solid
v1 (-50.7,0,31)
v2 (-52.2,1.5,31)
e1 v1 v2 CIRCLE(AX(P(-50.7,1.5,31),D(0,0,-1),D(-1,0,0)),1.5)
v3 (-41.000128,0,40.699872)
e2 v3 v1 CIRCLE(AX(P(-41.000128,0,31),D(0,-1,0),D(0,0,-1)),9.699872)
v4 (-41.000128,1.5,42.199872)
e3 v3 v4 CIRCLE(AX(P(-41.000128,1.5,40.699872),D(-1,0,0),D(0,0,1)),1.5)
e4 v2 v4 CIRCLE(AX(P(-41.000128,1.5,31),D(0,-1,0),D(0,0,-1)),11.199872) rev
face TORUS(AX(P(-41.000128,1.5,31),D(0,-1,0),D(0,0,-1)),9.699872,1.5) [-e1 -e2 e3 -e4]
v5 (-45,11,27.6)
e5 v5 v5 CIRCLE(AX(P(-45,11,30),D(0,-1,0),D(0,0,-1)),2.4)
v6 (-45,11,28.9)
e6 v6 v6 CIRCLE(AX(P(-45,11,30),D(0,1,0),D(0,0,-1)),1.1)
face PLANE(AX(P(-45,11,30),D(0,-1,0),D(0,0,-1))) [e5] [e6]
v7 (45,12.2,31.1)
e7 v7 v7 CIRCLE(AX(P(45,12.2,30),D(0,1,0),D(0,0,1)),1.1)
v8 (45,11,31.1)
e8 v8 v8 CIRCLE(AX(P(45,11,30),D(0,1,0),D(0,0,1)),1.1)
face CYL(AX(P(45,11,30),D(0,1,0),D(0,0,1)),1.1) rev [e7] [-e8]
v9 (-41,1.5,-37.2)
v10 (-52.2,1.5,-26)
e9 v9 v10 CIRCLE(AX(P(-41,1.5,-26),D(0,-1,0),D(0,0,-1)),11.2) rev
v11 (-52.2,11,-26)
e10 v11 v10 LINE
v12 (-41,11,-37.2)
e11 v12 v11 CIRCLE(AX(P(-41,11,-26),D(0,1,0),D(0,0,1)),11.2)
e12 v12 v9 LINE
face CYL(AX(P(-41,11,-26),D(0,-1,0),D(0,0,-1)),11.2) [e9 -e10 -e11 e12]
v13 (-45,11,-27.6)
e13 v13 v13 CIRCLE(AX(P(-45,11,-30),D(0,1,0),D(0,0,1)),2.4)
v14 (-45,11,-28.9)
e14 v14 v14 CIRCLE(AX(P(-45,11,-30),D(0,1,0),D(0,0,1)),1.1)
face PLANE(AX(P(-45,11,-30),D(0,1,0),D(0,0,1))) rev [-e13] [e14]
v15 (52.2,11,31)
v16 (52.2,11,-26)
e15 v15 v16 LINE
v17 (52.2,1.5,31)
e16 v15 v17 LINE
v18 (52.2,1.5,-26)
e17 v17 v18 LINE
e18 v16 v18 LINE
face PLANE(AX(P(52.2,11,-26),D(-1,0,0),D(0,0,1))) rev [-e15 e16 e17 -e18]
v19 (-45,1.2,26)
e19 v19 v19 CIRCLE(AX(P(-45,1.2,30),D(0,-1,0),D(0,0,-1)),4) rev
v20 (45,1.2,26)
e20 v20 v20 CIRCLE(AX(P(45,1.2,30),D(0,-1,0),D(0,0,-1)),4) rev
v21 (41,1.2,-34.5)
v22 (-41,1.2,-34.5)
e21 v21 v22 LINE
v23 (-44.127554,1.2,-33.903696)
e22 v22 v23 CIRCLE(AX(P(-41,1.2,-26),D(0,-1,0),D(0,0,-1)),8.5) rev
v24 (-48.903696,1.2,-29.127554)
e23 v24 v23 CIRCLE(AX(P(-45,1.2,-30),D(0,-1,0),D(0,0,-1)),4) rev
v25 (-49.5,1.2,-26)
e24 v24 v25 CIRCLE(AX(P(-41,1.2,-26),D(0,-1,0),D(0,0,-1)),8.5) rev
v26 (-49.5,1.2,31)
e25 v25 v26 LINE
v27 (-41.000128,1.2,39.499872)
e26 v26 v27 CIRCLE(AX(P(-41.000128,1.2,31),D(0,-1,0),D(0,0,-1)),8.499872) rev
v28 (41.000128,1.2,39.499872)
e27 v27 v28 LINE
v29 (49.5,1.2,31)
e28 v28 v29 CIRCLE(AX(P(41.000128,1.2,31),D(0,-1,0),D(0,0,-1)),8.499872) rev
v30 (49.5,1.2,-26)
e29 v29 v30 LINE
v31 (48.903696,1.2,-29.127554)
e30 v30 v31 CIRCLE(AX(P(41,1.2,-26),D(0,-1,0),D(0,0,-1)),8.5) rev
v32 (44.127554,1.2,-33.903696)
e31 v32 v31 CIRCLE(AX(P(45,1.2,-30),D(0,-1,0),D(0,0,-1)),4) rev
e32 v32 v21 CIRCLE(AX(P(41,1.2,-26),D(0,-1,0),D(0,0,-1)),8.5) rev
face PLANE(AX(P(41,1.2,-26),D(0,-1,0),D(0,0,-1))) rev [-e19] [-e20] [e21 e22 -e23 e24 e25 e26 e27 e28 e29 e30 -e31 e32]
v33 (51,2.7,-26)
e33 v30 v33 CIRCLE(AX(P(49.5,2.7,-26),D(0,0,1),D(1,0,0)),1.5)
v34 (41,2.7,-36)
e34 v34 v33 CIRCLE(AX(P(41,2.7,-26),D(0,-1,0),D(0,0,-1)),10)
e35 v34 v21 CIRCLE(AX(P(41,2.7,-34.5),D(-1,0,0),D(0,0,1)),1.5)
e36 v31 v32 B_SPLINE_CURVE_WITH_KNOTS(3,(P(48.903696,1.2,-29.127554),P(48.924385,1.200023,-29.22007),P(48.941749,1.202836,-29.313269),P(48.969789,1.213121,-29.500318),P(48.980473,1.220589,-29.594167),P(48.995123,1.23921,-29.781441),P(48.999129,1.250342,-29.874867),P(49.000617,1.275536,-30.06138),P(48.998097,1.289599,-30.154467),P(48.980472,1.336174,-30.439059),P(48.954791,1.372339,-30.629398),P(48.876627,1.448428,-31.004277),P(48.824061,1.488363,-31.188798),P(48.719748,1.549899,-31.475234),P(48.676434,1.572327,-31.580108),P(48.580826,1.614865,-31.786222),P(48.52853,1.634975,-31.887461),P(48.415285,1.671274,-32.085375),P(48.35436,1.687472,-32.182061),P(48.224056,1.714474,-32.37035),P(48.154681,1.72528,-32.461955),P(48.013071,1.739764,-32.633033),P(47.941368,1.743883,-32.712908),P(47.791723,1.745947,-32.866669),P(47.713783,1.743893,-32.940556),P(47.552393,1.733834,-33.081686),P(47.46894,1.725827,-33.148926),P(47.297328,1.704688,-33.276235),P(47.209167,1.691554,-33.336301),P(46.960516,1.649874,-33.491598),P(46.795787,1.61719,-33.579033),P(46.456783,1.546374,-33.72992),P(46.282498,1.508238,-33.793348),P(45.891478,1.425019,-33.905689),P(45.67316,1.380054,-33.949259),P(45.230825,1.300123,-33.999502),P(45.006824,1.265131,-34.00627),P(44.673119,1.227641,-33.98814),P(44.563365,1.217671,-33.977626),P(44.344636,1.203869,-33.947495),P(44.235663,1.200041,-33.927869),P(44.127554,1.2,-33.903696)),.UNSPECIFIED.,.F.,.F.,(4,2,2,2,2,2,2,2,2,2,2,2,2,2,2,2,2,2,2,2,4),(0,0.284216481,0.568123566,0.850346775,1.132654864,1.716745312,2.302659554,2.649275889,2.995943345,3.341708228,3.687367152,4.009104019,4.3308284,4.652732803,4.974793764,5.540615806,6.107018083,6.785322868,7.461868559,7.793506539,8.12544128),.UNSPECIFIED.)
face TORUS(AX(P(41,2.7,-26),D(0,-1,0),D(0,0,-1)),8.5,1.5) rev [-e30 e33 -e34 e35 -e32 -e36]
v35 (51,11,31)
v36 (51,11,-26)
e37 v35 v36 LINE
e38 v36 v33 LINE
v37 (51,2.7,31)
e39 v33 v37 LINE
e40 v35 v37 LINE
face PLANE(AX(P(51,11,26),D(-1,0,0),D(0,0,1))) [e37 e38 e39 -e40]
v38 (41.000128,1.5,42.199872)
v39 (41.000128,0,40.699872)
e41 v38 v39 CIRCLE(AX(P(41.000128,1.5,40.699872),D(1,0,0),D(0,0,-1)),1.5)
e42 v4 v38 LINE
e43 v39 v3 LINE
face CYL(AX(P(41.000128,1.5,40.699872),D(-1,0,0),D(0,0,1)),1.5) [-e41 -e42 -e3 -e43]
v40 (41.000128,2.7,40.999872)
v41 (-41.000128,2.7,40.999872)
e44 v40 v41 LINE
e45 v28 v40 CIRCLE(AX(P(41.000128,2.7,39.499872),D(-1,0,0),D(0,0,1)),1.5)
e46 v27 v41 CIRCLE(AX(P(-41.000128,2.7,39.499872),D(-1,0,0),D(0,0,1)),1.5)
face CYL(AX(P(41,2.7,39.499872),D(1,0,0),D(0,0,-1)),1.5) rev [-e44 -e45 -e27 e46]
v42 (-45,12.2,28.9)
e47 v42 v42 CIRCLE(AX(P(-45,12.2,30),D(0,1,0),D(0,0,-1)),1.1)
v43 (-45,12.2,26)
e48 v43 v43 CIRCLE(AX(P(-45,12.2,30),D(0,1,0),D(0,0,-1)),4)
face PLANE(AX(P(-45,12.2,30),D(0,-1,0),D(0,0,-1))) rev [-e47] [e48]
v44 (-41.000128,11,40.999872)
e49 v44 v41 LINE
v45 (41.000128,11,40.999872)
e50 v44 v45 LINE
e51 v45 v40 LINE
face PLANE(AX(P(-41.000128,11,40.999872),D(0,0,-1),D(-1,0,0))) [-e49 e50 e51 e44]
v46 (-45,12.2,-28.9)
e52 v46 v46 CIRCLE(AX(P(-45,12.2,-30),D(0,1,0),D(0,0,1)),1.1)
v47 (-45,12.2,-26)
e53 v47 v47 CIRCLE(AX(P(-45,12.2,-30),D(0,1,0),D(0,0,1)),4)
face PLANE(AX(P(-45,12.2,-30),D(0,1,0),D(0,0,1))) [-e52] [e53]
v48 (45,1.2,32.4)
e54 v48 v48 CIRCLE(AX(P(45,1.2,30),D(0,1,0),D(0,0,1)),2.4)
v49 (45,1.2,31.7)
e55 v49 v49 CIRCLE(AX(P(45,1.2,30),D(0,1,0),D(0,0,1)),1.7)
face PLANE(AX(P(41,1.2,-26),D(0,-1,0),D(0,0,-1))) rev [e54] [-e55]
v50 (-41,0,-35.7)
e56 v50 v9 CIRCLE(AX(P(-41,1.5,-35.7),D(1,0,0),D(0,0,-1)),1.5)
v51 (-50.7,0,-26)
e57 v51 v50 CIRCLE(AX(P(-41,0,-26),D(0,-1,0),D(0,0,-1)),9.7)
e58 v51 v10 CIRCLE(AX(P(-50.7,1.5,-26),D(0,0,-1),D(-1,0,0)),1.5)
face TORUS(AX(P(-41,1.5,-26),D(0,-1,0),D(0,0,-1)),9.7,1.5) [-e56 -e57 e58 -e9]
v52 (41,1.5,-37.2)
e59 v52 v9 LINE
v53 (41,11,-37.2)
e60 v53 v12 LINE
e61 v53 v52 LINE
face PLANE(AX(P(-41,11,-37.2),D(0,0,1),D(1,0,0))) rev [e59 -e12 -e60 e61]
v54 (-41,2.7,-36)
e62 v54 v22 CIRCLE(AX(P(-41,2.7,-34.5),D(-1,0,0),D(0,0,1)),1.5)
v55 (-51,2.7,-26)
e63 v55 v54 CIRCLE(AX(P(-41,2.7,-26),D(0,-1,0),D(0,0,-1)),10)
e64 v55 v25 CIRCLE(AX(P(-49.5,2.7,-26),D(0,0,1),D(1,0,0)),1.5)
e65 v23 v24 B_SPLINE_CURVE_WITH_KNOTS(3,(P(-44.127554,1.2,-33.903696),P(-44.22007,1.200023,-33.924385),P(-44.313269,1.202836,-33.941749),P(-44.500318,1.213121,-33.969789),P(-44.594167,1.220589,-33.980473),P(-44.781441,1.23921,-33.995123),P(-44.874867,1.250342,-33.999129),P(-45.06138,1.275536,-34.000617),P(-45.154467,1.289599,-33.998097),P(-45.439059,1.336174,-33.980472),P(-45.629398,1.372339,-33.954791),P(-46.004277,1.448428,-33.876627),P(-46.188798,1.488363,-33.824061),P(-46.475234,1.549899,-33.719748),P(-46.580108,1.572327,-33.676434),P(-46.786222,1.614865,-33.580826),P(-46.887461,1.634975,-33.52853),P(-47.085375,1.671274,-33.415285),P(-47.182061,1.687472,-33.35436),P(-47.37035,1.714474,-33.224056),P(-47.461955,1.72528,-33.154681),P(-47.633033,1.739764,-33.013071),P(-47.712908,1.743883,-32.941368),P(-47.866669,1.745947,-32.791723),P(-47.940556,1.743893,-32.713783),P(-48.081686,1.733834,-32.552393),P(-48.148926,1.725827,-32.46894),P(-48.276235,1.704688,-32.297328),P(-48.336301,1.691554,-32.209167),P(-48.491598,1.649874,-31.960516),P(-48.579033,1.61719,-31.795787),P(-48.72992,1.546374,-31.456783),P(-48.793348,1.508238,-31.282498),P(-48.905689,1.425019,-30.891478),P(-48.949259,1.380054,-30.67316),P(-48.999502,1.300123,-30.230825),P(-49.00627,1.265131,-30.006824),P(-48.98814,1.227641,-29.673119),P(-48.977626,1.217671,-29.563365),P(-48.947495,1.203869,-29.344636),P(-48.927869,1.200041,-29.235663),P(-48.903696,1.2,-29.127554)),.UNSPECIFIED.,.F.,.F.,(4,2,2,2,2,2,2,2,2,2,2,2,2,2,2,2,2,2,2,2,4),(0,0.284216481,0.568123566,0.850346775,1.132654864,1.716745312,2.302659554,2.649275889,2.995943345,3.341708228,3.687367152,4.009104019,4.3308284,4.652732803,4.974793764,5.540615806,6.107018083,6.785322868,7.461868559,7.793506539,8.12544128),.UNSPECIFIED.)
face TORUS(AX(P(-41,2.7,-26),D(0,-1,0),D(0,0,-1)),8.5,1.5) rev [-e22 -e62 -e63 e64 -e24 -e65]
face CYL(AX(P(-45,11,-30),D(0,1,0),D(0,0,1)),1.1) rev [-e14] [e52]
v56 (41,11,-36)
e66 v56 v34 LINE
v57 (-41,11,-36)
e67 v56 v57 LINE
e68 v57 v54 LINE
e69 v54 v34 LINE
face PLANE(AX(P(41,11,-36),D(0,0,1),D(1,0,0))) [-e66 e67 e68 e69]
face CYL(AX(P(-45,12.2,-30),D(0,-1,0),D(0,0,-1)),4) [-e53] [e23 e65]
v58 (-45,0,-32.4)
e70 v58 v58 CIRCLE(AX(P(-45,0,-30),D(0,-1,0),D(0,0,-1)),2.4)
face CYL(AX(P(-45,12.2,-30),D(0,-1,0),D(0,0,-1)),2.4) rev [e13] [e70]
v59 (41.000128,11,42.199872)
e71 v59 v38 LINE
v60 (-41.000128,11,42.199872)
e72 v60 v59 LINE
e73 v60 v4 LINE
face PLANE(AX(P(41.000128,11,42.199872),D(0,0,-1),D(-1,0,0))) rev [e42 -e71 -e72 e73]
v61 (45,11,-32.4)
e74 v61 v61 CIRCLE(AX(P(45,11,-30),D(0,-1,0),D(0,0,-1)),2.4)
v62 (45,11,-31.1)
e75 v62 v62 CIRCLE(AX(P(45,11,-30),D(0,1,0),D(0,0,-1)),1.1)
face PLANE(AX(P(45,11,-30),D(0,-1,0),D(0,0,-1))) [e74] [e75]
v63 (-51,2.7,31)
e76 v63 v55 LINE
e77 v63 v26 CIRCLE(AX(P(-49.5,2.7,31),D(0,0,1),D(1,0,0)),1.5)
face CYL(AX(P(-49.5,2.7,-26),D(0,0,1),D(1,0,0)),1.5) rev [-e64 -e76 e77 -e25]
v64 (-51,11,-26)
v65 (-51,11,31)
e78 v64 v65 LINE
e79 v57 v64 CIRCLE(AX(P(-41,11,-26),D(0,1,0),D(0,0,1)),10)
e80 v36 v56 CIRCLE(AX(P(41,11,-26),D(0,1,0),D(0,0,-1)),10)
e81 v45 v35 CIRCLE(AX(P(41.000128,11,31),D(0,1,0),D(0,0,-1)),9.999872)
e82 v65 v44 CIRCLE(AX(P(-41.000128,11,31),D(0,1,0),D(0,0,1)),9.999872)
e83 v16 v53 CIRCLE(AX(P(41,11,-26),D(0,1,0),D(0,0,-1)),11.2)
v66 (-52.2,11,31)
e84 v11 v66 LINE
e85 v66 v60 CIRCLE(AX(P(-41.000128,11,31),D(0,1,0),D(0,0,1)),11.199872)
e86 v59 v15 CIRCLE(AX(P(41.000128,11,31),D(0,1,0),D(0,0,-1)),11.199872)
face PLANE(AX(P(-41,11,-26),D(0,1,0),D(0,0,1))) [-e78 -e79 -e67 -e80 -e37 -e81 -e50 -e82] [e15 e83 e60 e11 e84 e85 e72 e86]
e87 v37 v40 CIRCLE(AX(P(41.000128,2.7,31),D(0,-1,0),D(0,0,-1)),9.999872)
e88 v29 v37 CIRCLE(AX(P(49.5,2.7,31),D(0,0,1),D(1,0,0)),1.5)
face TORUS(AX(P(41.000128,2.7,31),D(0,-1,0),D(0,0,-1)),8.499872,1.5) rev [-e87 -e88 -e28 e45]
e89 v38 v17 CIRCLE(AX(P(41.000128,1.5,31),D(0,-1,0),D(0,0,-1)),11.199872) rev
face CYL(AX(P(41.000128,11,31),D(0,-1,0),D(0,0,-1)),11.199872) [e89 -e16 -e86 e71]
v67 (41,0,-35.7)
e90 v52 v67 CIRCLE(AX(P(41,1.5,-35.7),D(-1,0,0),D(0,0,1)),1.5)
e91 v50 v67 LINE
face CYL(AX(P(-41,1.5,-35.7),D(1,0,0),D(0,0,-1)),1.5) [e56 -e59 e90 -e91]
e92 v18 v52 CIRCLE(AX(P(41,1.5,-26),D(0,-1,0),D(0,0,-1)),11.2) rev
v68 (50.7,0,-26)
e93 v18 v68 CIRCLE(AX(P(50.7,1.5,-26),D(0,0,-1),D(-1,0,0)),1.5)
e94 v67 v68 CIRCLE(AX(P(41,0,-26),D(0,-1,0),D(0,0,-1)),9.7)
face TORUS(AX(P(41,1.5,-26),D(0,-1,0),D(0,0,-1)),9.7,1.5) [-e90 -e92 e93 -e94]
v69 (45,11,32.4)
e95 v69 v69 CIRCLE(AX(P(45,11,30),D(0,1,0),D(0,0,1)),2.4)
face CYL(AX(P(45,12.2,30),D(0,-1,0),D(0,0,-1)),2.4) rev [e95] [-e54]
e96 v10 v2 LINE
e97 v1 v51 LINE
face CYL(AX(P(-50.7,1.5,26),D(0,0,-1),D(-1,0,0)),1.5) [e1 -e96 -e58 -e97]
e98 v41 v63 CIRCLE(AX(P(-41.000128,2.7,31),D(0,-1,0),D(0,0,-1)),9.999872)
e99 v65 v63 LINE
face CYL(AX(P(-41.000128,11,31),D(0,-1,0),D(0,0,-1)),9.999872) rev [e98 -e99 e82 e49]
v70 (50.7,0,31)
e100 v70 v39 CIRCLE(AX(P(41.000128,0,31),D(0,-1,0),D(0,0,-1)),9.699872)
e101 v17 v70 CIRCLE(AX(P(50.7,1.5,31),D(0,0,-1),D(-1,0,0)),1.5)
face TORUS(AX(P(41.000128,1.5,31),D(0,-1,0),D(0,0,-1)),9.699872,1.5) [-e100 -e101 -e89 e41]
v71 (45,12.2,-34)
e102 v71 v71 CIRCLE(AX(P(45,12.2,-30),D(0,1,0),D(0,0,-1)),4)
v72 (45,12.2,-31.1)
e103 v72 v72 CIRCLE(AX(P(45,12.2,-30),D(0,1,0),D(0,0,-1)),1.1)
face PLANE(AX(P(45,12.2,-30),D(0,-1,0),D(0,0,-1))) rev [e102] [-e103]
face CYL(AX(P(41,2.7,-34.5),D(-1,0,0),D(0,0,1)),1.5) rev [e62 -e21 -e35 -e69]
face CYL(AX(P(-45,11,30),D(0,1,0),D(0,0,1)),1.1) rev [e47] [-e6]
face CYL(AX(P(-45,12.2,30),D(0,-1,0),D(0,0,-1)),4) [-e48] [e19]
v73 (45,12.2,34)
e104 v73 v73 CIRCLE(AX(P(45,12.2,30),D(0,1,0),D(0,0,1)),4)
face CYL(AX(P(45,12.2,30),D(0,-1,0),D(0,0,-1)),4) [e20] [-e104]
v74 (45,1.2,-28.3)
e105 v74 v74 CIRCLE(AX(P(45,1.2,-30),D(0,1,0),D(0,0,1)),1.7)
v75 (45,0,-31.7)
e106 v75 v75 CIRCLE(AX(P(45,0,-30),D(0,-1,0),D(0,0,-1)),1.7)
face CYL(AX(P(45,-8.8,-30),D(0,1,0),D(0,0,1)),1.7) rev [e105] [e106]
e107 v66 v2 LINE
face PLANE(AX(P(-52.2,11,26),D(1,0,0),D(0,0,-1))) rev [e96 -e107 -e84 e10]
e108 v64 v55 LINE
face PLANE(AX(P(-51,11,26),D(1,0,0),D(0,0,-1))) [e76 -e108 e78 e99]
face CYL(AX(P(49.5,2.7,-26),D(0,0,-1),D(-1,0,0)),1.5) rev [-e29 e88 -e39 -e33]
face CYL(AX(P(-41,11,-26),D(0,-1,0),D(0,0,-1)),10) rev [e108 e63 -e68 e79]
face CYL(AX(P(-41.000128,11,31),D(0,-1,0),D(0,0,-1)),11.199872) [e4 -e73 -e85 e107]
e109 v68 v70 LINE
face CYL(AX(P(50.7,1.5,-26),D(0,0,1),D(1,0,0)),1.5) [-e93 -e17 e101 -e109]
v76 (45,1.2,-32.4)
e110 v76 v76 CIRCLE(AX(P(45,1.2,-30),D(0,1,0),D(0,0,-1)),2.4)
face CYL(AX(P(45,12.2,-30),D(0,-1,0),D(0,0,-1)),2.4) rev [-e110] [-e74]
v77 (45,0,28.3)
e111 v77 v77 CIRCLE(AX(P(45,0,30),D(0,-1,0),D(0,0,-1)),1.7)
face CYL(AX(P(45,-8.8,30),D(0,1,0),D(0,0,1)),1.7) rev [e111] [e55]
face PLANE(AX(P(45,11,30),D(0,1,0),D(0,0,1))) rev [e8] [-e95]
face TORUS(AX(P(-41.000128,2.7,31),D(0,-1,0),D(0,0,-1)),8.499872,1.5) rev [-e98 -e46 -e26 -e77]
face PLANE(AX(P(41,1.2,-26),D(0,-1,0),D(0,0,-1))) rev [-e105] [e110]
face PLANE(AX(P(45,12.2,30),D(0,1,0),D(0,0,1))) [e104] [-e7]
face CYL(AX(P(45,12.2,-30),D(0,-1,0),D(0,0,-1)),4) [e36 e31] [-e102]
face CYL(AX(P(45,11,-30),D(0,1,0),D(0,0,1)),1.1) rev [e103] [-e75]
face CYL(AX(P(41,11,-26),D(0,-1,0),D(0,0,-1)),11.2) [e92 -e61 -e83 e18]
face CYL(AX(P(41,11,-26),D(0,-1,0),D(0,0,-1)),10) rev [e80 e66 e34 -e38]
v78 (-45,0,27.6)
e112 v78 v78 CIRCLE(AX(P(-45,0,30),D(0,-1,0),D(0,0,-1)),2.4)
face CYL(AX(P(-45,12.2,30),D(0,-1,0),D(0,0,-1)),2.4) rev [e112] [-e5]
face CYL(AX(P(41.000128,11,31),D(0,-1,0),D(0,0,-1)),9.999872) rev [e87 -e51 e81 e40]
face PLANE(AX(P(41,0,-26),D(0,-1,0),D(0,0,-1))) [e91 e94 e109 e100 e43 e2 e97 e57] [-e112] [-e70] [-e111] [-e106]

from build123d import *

# Parameters (mm, degrees)
EXTRUDE_3_DEPTH     = 1.2
EXTRUDE_4_DEPTH     = 11
SKETCH_6_R          = 4
SKETCH_6_R_2        = 2.4
EXTRUDE_5_DEPTH     = 11
CUT_EXTRUDE_START   = -10
SKETCH_7_R          = 2.4
SKETCH_7_R_2        = 1.7
CUT_EXTRUDE_1_DEPTH = 10
EXTRUDE_START       = -1.2
SKETCH_8_R          = 2.4
SKETCH_8_R_2        = 1.1
EXTRUDE_6_DEPTH     = 1.2
FILLET_1_R          = 1.5


with BuildPart() as part:
    # 草图1 → 凸台-拉伸3 (new body)
    with BuildSketch(Plane(origin=(0, 0, 0), x_dir=(1, 0, 0), z_dir=(0, 1, 0))):
        with BuildLine():
            Line((51, -26), (51, 26))
            ThreePointArc((51, 26), (48.071067812, 33.071067812), (41, 36))
            Line((41, 36), (-41, 36))
            ThreePointArc((-41, 36), (-48.071067812, 33.071067812), (-51, 26))
            Line((-51, 26), (-51, -26))
            Line((-51, -26), (-51, -31))
            ThreePointArc((-51, -31), (-48.071067812, -38.071067812), (-41, -41))
            Line((-41, -41), (41, -41))
            ThreePointArc((41, -41), (48.071067812, -38.071067812), (51, -31))
            Line((51, -31), (51, -26))
        make_face()
    extrude(amount=EXTRUDE_3_DEPTH)

    # 草图4 → 凸台-拉伸4 (add)
    with BuildSketch(Plane(origin=(0, 0, 0), x_dir=(1, 0, 0), z_dir=(0, 1, 0))):
        with BuildLine():
            Line((-41, 37.2), (41, 37.2))
            ThreePointArc((41, 37.2), (48.919595949, 33.919595949), (52.2, 26))
            Line((52.2, 26), (52.2, -26))
            Line((52.2, -26), (52.2, -31))
            ThreePointArc((52.2, -31), (48.919633331, -38.919505702), (41.000127629, -42.199872371))
            Line((41.000127629, -42.199872371), (-41.000127629, -42.199872371))
            ThreePointArc((-41.000127629, -42.199872371), (-48.919633331, -38.919505702), (-52.2, -31))
            Line((-52.2, -31), (-52.2, -26))
            Line((-52.2, -26), (-52.2, 26))
            ThreePointArc((-52.2, 26), (-48.919595949, 33.919595949), (-41, 37.2))
        make_face()
        with BuildLine():
            Line((51, -26), (51, 26))
            ThreePointArc((51, 26), (48.071067812, 33.071067812), (41, 36))
            Line((41, 36), (-41, 36))
            ThreePointArc((-41, 36), (-48.071067812, 33.071067812), (-51, 26))
            Line((-51, 26), (-51, -26))
            Line((-51, -26), (-51, -31))
            ThreePointArc((-51, -31), (-48.071105194, -38.070977564), (-41.000127629, -40.999872371))
            Line((-41.000127629, -40.999872371), (41.000127629, -40.999872371))
            ThreePointArc((41.000127629, -40.999872371), (48.071105194, -38.070977564), (51, -31))
            Line((51, -31), (51, -26))
        make_face(mode=Mode.SUBTRACT)
    extrude(amount=EXTRUDE_4_DEPTH)

    # 草图6 → 凸台-拉伸5 (add)
    # profile 1 of 4: a face of its own
    with BuildSketch(Plane(origin=(0, 1.2, 0), x_dir=(1, 0, 0), z_dir=(0, 1, 0))):
        with Locations(Location((-45, 30, 0), (0, 0, 90))):
            Circle(SKETCH_6_R)
        with Locations(Location((-45, 30, 0), (0, 0, 270))):
            Circle(SKETCH_6_R_2, mode=Mode.SUBTRACT)
    # profile 2 of 4: a face of its own
    with BuildSketch(Plane(origin=(0, 1.2, 0), x_dir=(1, 0, 0), z_dir=(0, 1, 0))):
        with Locations(Location((45, 30, 0), (0, 0, 90))):
            Circle(SKETCH_6_R)
        with Locations(Location((45, 30, 0), (0, 0, 90))):
            Circle(SKETCH_6_R_2, mode=Mode.SUBTRACT)
    # profile 3 of 4: a face of its own
    with BuildSketch(Plane(origin=(0, 1.2, 0), x_dir=(1, 0, 0), z_dir=(0, 1, 0))):
        with Locations(Location((45, -30, 0), (0, 0, 90))):
            Circle(SKETCH_6_R)
        with Locations(Location((45, -30, 0), (0, 0, 270))):
            Circle(SKETCH_6_R_2, mode=Mode.SUBTRACT)
    # profile 4 of 4: a face of its own
    with BuildSketch(Plane(origin=(0, 1.2, 0), x_dir=(1, 0, 0), z_dir=(0, 1, 0))):
        with Locations(Location((-45, -30, 0), (0, 0, 90))):
            Circle(SKETCH_6_R)
        with Locations(Location((-45, -30, 0), (0, 0, 90))):
            Circle(SKETCH_6_R_2, mode=Mode.SUBTRACT)
    extrude(amount=EXTRUDE_5_DEPTH)

    # 草图7 → 切除-拉伸1 (cut)
    with BuildSketch(Plane(origin=(0, 1.2, 0), x_dir=(1, 0, 0), z_dir=(0, 1, 0)).offset(CUT_EXTRUDE_START)):
        with Locations(Location((-45, 30, 0), (0, 0, 90))):
            Circle(SKETCH_7_R)
        with Locations(Location((45, 30, 0), (0, 0, 270))):
            Circle(SKETCH_7_R_2)
        with Locations(Location((45, -30, 0), (0, 0, 270))):
            Circle(SKETCH_7_R_2)
        with Locations(Location((-45, -30, 0), (0, 0, 90))):
            Circle(SKETCH_7_R)
    extrude(amount=CUT_EXTRUDE_1_DEPTH, mode=Mode.SUBTRACT)

    # 草图8 → 凸台-拉伸6 (add)
    # profile 1 of 4: a face of its own
    with BuildSketch(Plane(origin=(0, 12.2, 0), x_dir=(1, 0, 0), z_dir=(0, 1, 0)).offset(EXTRUDE_START)):
        with Locations(Location((-45, 30, 0), (0, 0, 90))):
            Circle(SKETCH_8_R)
        with Locations(Location((-45, 30, 0), (0, 0, 270))):
            Circle(SKETCH_8_R_2, mode=Mode.SUBTRACT)
    # profile 2 of 4: a face of its own
    with BuildSketch(Plane(origin=(0, 12.2, 0), x_dir=(1, 0, 0), z_dir=(0, 1, 0)).offset(EXTRUDE_START)):
        with Locations(Location((45, 30, 0), (0, 0, 90))):
            Circle(SKETCH_8_R)
        with Locations(Location((45, 30, 0), (0, 0, 90))):
            Circle(SKETCH_8_R_2, mode=Mode.SUBTRACT)
    # profile 3 of 4: a face of its own
    with BuildSketch(Plane(origin=(0, 12.2, 0), x_dir=(1, 0, 0), z_dir=(0, 1, 0)).offset(EXTRUDE_START)):
        with Locations(Location((45, -30, 0), (0, 0, 270))):
            Circle(SKETCH_8_R)
        with Locations(Location((45, -30, 0), (0, 0, 270))):
            Circle(SKETCH_8_R_2, mode=Mode.SUBTRACT)
    # profile 4 of 4: a face of its own
    with BuildSketch(Plane(origin=(0, 12.2, 0), x_dir=(1, 0, 0), z_dir=(0, 1, 0)).offset(EXTRUDE_START)):
        with Locations(Location((-45, -30, 0), (0, 0, 90))):
            Circle(SKETCH_8_R)
        with Locations(Location((-45, -30, 0), (0, 0, 90))):
            Circle(SKETCH_8_R_2, mode=Mode.SUBTRACT)
    extrude(amount=EXTRUDE_6_DEPTH)

    # 圆角1
    # the kernel refuses this fillet: 1.5 mm, written as the material it adds along each edge
    with BuildSketch(Plane(origin=(-41, 1.2, -26), x_dir=(0, 0, -1), z_dir=(1, 0, 0))) as fillet_1_piece_1:
        with BuildLine():
            CenterArc((10 - FILLET_1_R, FILLET_1_R), FILLET_1_R, 270, 90)
            Line((10, FILLET_1_R), (10, 0))
            Line((10, 0), (10 - FILLET_1_R, 0))
        make_face()
    revolve(axis=Axis((-41, 1.2, -26), (0, 1, 0)), revolution_arc=90)
    with BuildSketch(Plane(origin=(-51, 1.2, 31), x_dir=(1, 0, 0), z_dir=(0, 0, -1)), Plane(origin=(51, 1.2, -26), x_dir=(-1, 0, 0), z_dir=(0, 0, 1))) as fillet_1_piece_2:
        with BuildLine():
            CenterArc((FILLET_1_R, -FILLET_1_R), FILLET_1_R, 90, 90)
            Line((0, -FILLET_1_R), (0, 0))
            Line((0, 0), (FILLET_1_R, 0))
        make_face()
    extrude(amount=57)
    with BuildSketch(Plane(origin=(41, 1.2, -26), x_dir=(1, 0, 0), z_dir=(0, 0, 1))) as fillet_1_piece_3:
        with BuildLine():
            CenterArc((10 - FILLET_1_R, FILLET_1_R), FILLET_1_R, 270, 90)
            Line((10, FILLET_1_R), (10, 0))
            Line((10, 0), (10 - FILLET_1_R, 0))
        make_face()
    revolve(axis=Axis((41, 1.2, -26), (0, 1, 0)), revolution_arc=90)
    with BuildSketch(Plane(origin=(-41.000127629, 1.2, 31), x_dir=(0, 0, 1), z_dir=(1, 0, 0))) as fillet_1_piece_4:
        with BuildLine():
            CenterArc((9.999872371 - FILLET_1_R, -FILLET_1_R), FILLET_1_R, 0, 90)
            Line((9.999872371, -FILLET_1_R), (9.999872371, 0))
            Line((9.999872371, 0), (9.999872371 - FILLET_1_R, 0))
        make_face()
    revolve(axis=Axis((-41.000127629, 1.2, 31), (0, -1, 0)), revolution_arc=90)
    with BuildSketch(Plane(origin=(41.000127629, 1.2, 40.999872371), x_dir=(0, 0, -1), z_dir=(-1, 0, 0))) as fillet_1_piece_5:
        with BuildLine():
            CenterArc((FILLET_1_R, -FILLET_1_R), FILLET_1_R, 90, 90)
            Line((0, -FILLET_1_R), (0, 0))
            Line((0, 0), (FILLET_1_R, 0))
        make_face()
    extrude(amount=82.000255259)
    with BuildSketch(Plane(origin=(41.000127629, 1.2, 31), x_dir=(1, 0, 0), z_dir=(0, 0, -1))) as fillet_1_piece_6:
        with BuildLine():
            CenterArc((9.999872371 - FILLET_1_R, -FILLET_1_R), FILLET_1_R, 0, 90)
            Line((9.999872371, -FILLET_1_R), (9.999872371, 0))
            Line((9.999872371, 0), (9.999872371 - FILLET_1_R, 0))
        make_face()
    revolve(axis=Axis((41.000127629, 1.2, 31), (0, -1, 0)), revolution_arc=90)
    with BuildSketch(Plane(origin=(41, 1.2, -36), x_dir=(0, 0, 1), z_dir=(-1, 0, 0))) as fillet_1_piece_7:
        with BuildLine():
            CenterArc((FILLET_1_R, FILLET_1_R), FILLET_1_R, 180, 90)
            Line((0, FILLET_1_R), (0, 0))
            Line((0, 0), (FILLET_1_R, 0))
        make_face()
    extrude(amount=82)
    # the kernel refuses this fillet: 1.5 mm, written as the material it takes off along each edge
    with BuildSketch(Plane(origin=(-41, 0, -26), x_dir=(-1, 0, 0), z_dir=(0, 0, 1))) as fillet_1_2_piece_1:
        with BuildLine():
            CenterArc((11.2 - FILLET_1_R, -FILLET_1_R), FILLET_1_R, 0, 90)
            Line((11.2, -FILLET_1_R), (11.2, 0))
            Line((11.2, 0), (11.2 - FILLET_1_R, 0))
        make_face()
    revolve(axis=Axis((-41, 0, -26), (0, -1, 0)), revolution_arc=90, mode=Mode.SUBTRACT)
    with BuildSketch(Plane(origin=(-52.2, 0, -26), x_dir=(1, 0, 0), z_dir=(0, 0, 1)), Plane(origin=(52.2, 0, 31), x_dir=(-1, 0, 0), z_dir=(0, 0, -1))) as fillet_1_2_piece_2:
        with BuildLine():
            CenterArc((FILLET_1_R, FILLET_1_R), FILLET_1_R, 180, 90)
            Line((0, FILLET_1_R), (0, 0))
            Line((0, 0), (FILLET_1_R, 0))
        make_face()
    extrude(amount=57, mode=Mode.SUBTRACT)
    with BuildSketch(Plane(origin=(-41.000127629, 0, 31), x_dir=(0, 0, 1), z_dir=(1, 0, 0))) as fillet_1_2_piece_3:
        with BuildLine():
            CenterArc((11.199872371 - FILLET_1_R, -FILLET_1_R), FILLET_1_R, 0, 90)
            Line((11.199872371, -FILLET_1_R), (11.199872371, 0))
            Line((11.199872371, 0), (11.199872371 - FILLET_1_R, 0))
        make_face()
    revolve(axis=Axis((-41.000127629, 0, 31), (0, -1, 0)), revolution_arc=90, mode=Mode.SUBTRACT)
    with BuildSketch(Plane(origin=(41.000127629, 0, 42.199872371), x_dir=(0, 0, -1), z_dir=(-1, 0, 0))) as fillet_1_2_piece_4:
        with BuildLine():
            CenterArc((FILLET_1_R, -FILLET_1_R), FILLET_1_R, 90, 90)
            Line((0, -FILLET_1_R), (0, 0))
            Line((0, 0), (FILLET_1_R, 0))
        make_face()
    extrude(amount=82.000255259, mode=Mode.SUBTRACT)
    with BuildSketch(Plane(origin=(41.000127629, 0, 31), x_dir=(1, 0, 0), z_dir=(0, 0, -1))) as fillet_1_2_piece_5:
        with BuildLine():
            CenterArc((11.199872371 - FILLET_1_R, -FILLET_1_R), FILLET_1_R, 0, 90)
            Line((11.199872371, -FILLET_1_R), (11.199872371, 0))
            Line((11.199872371, 0), (11.199872371 - FILLET_1_R, 0))
        make_face()
    revolve(axis=Axis((41.000127629, 0, 31), (0, -1, 0)), revolution_arc=90, mode=Mode.SUBTRACT)
    with BuildSketch(Plane(origin=(41, 0, -26), x_dir=(0, 0, -1), z_dir=(-1, 0, 0))) as fillet_1_2_piece_6:
        with BuildLine():
            CenterArc((11.2 - FILLET_1_R, -FILLET_1_R), FILLET_1_R, 0, 90)
            Line((11.2, -FILLET_1_R), (11.2, 0))
            Line((11.2, 0), (11.2 - FILLET_1_R, 0))
        make_face()
    revolve(axis=Axis((41, 0, -26), (0, -1, 0)), revolution_arc=90, mode=Mode.SUBTRACT)
    with BuildSketch(Plane(origin=(-41, 0, -37.2), x_dir=(0, 0, 1), z_dir=(1, 0, 0))) as fillet_1_2_piece_7:
        with BuildLine():
            CenterArc((FILLET_1_R, -FILLET_1_R), FILLET_1_R, 90, 90)
            Line((0, -FILLET_1_R), (0, 0))
            Line((0, 0), (FILLET_1_R, 0))
        make_face()
    extrude(amount=82, mode=Mode.SUBTRACT)


solid = part.part
